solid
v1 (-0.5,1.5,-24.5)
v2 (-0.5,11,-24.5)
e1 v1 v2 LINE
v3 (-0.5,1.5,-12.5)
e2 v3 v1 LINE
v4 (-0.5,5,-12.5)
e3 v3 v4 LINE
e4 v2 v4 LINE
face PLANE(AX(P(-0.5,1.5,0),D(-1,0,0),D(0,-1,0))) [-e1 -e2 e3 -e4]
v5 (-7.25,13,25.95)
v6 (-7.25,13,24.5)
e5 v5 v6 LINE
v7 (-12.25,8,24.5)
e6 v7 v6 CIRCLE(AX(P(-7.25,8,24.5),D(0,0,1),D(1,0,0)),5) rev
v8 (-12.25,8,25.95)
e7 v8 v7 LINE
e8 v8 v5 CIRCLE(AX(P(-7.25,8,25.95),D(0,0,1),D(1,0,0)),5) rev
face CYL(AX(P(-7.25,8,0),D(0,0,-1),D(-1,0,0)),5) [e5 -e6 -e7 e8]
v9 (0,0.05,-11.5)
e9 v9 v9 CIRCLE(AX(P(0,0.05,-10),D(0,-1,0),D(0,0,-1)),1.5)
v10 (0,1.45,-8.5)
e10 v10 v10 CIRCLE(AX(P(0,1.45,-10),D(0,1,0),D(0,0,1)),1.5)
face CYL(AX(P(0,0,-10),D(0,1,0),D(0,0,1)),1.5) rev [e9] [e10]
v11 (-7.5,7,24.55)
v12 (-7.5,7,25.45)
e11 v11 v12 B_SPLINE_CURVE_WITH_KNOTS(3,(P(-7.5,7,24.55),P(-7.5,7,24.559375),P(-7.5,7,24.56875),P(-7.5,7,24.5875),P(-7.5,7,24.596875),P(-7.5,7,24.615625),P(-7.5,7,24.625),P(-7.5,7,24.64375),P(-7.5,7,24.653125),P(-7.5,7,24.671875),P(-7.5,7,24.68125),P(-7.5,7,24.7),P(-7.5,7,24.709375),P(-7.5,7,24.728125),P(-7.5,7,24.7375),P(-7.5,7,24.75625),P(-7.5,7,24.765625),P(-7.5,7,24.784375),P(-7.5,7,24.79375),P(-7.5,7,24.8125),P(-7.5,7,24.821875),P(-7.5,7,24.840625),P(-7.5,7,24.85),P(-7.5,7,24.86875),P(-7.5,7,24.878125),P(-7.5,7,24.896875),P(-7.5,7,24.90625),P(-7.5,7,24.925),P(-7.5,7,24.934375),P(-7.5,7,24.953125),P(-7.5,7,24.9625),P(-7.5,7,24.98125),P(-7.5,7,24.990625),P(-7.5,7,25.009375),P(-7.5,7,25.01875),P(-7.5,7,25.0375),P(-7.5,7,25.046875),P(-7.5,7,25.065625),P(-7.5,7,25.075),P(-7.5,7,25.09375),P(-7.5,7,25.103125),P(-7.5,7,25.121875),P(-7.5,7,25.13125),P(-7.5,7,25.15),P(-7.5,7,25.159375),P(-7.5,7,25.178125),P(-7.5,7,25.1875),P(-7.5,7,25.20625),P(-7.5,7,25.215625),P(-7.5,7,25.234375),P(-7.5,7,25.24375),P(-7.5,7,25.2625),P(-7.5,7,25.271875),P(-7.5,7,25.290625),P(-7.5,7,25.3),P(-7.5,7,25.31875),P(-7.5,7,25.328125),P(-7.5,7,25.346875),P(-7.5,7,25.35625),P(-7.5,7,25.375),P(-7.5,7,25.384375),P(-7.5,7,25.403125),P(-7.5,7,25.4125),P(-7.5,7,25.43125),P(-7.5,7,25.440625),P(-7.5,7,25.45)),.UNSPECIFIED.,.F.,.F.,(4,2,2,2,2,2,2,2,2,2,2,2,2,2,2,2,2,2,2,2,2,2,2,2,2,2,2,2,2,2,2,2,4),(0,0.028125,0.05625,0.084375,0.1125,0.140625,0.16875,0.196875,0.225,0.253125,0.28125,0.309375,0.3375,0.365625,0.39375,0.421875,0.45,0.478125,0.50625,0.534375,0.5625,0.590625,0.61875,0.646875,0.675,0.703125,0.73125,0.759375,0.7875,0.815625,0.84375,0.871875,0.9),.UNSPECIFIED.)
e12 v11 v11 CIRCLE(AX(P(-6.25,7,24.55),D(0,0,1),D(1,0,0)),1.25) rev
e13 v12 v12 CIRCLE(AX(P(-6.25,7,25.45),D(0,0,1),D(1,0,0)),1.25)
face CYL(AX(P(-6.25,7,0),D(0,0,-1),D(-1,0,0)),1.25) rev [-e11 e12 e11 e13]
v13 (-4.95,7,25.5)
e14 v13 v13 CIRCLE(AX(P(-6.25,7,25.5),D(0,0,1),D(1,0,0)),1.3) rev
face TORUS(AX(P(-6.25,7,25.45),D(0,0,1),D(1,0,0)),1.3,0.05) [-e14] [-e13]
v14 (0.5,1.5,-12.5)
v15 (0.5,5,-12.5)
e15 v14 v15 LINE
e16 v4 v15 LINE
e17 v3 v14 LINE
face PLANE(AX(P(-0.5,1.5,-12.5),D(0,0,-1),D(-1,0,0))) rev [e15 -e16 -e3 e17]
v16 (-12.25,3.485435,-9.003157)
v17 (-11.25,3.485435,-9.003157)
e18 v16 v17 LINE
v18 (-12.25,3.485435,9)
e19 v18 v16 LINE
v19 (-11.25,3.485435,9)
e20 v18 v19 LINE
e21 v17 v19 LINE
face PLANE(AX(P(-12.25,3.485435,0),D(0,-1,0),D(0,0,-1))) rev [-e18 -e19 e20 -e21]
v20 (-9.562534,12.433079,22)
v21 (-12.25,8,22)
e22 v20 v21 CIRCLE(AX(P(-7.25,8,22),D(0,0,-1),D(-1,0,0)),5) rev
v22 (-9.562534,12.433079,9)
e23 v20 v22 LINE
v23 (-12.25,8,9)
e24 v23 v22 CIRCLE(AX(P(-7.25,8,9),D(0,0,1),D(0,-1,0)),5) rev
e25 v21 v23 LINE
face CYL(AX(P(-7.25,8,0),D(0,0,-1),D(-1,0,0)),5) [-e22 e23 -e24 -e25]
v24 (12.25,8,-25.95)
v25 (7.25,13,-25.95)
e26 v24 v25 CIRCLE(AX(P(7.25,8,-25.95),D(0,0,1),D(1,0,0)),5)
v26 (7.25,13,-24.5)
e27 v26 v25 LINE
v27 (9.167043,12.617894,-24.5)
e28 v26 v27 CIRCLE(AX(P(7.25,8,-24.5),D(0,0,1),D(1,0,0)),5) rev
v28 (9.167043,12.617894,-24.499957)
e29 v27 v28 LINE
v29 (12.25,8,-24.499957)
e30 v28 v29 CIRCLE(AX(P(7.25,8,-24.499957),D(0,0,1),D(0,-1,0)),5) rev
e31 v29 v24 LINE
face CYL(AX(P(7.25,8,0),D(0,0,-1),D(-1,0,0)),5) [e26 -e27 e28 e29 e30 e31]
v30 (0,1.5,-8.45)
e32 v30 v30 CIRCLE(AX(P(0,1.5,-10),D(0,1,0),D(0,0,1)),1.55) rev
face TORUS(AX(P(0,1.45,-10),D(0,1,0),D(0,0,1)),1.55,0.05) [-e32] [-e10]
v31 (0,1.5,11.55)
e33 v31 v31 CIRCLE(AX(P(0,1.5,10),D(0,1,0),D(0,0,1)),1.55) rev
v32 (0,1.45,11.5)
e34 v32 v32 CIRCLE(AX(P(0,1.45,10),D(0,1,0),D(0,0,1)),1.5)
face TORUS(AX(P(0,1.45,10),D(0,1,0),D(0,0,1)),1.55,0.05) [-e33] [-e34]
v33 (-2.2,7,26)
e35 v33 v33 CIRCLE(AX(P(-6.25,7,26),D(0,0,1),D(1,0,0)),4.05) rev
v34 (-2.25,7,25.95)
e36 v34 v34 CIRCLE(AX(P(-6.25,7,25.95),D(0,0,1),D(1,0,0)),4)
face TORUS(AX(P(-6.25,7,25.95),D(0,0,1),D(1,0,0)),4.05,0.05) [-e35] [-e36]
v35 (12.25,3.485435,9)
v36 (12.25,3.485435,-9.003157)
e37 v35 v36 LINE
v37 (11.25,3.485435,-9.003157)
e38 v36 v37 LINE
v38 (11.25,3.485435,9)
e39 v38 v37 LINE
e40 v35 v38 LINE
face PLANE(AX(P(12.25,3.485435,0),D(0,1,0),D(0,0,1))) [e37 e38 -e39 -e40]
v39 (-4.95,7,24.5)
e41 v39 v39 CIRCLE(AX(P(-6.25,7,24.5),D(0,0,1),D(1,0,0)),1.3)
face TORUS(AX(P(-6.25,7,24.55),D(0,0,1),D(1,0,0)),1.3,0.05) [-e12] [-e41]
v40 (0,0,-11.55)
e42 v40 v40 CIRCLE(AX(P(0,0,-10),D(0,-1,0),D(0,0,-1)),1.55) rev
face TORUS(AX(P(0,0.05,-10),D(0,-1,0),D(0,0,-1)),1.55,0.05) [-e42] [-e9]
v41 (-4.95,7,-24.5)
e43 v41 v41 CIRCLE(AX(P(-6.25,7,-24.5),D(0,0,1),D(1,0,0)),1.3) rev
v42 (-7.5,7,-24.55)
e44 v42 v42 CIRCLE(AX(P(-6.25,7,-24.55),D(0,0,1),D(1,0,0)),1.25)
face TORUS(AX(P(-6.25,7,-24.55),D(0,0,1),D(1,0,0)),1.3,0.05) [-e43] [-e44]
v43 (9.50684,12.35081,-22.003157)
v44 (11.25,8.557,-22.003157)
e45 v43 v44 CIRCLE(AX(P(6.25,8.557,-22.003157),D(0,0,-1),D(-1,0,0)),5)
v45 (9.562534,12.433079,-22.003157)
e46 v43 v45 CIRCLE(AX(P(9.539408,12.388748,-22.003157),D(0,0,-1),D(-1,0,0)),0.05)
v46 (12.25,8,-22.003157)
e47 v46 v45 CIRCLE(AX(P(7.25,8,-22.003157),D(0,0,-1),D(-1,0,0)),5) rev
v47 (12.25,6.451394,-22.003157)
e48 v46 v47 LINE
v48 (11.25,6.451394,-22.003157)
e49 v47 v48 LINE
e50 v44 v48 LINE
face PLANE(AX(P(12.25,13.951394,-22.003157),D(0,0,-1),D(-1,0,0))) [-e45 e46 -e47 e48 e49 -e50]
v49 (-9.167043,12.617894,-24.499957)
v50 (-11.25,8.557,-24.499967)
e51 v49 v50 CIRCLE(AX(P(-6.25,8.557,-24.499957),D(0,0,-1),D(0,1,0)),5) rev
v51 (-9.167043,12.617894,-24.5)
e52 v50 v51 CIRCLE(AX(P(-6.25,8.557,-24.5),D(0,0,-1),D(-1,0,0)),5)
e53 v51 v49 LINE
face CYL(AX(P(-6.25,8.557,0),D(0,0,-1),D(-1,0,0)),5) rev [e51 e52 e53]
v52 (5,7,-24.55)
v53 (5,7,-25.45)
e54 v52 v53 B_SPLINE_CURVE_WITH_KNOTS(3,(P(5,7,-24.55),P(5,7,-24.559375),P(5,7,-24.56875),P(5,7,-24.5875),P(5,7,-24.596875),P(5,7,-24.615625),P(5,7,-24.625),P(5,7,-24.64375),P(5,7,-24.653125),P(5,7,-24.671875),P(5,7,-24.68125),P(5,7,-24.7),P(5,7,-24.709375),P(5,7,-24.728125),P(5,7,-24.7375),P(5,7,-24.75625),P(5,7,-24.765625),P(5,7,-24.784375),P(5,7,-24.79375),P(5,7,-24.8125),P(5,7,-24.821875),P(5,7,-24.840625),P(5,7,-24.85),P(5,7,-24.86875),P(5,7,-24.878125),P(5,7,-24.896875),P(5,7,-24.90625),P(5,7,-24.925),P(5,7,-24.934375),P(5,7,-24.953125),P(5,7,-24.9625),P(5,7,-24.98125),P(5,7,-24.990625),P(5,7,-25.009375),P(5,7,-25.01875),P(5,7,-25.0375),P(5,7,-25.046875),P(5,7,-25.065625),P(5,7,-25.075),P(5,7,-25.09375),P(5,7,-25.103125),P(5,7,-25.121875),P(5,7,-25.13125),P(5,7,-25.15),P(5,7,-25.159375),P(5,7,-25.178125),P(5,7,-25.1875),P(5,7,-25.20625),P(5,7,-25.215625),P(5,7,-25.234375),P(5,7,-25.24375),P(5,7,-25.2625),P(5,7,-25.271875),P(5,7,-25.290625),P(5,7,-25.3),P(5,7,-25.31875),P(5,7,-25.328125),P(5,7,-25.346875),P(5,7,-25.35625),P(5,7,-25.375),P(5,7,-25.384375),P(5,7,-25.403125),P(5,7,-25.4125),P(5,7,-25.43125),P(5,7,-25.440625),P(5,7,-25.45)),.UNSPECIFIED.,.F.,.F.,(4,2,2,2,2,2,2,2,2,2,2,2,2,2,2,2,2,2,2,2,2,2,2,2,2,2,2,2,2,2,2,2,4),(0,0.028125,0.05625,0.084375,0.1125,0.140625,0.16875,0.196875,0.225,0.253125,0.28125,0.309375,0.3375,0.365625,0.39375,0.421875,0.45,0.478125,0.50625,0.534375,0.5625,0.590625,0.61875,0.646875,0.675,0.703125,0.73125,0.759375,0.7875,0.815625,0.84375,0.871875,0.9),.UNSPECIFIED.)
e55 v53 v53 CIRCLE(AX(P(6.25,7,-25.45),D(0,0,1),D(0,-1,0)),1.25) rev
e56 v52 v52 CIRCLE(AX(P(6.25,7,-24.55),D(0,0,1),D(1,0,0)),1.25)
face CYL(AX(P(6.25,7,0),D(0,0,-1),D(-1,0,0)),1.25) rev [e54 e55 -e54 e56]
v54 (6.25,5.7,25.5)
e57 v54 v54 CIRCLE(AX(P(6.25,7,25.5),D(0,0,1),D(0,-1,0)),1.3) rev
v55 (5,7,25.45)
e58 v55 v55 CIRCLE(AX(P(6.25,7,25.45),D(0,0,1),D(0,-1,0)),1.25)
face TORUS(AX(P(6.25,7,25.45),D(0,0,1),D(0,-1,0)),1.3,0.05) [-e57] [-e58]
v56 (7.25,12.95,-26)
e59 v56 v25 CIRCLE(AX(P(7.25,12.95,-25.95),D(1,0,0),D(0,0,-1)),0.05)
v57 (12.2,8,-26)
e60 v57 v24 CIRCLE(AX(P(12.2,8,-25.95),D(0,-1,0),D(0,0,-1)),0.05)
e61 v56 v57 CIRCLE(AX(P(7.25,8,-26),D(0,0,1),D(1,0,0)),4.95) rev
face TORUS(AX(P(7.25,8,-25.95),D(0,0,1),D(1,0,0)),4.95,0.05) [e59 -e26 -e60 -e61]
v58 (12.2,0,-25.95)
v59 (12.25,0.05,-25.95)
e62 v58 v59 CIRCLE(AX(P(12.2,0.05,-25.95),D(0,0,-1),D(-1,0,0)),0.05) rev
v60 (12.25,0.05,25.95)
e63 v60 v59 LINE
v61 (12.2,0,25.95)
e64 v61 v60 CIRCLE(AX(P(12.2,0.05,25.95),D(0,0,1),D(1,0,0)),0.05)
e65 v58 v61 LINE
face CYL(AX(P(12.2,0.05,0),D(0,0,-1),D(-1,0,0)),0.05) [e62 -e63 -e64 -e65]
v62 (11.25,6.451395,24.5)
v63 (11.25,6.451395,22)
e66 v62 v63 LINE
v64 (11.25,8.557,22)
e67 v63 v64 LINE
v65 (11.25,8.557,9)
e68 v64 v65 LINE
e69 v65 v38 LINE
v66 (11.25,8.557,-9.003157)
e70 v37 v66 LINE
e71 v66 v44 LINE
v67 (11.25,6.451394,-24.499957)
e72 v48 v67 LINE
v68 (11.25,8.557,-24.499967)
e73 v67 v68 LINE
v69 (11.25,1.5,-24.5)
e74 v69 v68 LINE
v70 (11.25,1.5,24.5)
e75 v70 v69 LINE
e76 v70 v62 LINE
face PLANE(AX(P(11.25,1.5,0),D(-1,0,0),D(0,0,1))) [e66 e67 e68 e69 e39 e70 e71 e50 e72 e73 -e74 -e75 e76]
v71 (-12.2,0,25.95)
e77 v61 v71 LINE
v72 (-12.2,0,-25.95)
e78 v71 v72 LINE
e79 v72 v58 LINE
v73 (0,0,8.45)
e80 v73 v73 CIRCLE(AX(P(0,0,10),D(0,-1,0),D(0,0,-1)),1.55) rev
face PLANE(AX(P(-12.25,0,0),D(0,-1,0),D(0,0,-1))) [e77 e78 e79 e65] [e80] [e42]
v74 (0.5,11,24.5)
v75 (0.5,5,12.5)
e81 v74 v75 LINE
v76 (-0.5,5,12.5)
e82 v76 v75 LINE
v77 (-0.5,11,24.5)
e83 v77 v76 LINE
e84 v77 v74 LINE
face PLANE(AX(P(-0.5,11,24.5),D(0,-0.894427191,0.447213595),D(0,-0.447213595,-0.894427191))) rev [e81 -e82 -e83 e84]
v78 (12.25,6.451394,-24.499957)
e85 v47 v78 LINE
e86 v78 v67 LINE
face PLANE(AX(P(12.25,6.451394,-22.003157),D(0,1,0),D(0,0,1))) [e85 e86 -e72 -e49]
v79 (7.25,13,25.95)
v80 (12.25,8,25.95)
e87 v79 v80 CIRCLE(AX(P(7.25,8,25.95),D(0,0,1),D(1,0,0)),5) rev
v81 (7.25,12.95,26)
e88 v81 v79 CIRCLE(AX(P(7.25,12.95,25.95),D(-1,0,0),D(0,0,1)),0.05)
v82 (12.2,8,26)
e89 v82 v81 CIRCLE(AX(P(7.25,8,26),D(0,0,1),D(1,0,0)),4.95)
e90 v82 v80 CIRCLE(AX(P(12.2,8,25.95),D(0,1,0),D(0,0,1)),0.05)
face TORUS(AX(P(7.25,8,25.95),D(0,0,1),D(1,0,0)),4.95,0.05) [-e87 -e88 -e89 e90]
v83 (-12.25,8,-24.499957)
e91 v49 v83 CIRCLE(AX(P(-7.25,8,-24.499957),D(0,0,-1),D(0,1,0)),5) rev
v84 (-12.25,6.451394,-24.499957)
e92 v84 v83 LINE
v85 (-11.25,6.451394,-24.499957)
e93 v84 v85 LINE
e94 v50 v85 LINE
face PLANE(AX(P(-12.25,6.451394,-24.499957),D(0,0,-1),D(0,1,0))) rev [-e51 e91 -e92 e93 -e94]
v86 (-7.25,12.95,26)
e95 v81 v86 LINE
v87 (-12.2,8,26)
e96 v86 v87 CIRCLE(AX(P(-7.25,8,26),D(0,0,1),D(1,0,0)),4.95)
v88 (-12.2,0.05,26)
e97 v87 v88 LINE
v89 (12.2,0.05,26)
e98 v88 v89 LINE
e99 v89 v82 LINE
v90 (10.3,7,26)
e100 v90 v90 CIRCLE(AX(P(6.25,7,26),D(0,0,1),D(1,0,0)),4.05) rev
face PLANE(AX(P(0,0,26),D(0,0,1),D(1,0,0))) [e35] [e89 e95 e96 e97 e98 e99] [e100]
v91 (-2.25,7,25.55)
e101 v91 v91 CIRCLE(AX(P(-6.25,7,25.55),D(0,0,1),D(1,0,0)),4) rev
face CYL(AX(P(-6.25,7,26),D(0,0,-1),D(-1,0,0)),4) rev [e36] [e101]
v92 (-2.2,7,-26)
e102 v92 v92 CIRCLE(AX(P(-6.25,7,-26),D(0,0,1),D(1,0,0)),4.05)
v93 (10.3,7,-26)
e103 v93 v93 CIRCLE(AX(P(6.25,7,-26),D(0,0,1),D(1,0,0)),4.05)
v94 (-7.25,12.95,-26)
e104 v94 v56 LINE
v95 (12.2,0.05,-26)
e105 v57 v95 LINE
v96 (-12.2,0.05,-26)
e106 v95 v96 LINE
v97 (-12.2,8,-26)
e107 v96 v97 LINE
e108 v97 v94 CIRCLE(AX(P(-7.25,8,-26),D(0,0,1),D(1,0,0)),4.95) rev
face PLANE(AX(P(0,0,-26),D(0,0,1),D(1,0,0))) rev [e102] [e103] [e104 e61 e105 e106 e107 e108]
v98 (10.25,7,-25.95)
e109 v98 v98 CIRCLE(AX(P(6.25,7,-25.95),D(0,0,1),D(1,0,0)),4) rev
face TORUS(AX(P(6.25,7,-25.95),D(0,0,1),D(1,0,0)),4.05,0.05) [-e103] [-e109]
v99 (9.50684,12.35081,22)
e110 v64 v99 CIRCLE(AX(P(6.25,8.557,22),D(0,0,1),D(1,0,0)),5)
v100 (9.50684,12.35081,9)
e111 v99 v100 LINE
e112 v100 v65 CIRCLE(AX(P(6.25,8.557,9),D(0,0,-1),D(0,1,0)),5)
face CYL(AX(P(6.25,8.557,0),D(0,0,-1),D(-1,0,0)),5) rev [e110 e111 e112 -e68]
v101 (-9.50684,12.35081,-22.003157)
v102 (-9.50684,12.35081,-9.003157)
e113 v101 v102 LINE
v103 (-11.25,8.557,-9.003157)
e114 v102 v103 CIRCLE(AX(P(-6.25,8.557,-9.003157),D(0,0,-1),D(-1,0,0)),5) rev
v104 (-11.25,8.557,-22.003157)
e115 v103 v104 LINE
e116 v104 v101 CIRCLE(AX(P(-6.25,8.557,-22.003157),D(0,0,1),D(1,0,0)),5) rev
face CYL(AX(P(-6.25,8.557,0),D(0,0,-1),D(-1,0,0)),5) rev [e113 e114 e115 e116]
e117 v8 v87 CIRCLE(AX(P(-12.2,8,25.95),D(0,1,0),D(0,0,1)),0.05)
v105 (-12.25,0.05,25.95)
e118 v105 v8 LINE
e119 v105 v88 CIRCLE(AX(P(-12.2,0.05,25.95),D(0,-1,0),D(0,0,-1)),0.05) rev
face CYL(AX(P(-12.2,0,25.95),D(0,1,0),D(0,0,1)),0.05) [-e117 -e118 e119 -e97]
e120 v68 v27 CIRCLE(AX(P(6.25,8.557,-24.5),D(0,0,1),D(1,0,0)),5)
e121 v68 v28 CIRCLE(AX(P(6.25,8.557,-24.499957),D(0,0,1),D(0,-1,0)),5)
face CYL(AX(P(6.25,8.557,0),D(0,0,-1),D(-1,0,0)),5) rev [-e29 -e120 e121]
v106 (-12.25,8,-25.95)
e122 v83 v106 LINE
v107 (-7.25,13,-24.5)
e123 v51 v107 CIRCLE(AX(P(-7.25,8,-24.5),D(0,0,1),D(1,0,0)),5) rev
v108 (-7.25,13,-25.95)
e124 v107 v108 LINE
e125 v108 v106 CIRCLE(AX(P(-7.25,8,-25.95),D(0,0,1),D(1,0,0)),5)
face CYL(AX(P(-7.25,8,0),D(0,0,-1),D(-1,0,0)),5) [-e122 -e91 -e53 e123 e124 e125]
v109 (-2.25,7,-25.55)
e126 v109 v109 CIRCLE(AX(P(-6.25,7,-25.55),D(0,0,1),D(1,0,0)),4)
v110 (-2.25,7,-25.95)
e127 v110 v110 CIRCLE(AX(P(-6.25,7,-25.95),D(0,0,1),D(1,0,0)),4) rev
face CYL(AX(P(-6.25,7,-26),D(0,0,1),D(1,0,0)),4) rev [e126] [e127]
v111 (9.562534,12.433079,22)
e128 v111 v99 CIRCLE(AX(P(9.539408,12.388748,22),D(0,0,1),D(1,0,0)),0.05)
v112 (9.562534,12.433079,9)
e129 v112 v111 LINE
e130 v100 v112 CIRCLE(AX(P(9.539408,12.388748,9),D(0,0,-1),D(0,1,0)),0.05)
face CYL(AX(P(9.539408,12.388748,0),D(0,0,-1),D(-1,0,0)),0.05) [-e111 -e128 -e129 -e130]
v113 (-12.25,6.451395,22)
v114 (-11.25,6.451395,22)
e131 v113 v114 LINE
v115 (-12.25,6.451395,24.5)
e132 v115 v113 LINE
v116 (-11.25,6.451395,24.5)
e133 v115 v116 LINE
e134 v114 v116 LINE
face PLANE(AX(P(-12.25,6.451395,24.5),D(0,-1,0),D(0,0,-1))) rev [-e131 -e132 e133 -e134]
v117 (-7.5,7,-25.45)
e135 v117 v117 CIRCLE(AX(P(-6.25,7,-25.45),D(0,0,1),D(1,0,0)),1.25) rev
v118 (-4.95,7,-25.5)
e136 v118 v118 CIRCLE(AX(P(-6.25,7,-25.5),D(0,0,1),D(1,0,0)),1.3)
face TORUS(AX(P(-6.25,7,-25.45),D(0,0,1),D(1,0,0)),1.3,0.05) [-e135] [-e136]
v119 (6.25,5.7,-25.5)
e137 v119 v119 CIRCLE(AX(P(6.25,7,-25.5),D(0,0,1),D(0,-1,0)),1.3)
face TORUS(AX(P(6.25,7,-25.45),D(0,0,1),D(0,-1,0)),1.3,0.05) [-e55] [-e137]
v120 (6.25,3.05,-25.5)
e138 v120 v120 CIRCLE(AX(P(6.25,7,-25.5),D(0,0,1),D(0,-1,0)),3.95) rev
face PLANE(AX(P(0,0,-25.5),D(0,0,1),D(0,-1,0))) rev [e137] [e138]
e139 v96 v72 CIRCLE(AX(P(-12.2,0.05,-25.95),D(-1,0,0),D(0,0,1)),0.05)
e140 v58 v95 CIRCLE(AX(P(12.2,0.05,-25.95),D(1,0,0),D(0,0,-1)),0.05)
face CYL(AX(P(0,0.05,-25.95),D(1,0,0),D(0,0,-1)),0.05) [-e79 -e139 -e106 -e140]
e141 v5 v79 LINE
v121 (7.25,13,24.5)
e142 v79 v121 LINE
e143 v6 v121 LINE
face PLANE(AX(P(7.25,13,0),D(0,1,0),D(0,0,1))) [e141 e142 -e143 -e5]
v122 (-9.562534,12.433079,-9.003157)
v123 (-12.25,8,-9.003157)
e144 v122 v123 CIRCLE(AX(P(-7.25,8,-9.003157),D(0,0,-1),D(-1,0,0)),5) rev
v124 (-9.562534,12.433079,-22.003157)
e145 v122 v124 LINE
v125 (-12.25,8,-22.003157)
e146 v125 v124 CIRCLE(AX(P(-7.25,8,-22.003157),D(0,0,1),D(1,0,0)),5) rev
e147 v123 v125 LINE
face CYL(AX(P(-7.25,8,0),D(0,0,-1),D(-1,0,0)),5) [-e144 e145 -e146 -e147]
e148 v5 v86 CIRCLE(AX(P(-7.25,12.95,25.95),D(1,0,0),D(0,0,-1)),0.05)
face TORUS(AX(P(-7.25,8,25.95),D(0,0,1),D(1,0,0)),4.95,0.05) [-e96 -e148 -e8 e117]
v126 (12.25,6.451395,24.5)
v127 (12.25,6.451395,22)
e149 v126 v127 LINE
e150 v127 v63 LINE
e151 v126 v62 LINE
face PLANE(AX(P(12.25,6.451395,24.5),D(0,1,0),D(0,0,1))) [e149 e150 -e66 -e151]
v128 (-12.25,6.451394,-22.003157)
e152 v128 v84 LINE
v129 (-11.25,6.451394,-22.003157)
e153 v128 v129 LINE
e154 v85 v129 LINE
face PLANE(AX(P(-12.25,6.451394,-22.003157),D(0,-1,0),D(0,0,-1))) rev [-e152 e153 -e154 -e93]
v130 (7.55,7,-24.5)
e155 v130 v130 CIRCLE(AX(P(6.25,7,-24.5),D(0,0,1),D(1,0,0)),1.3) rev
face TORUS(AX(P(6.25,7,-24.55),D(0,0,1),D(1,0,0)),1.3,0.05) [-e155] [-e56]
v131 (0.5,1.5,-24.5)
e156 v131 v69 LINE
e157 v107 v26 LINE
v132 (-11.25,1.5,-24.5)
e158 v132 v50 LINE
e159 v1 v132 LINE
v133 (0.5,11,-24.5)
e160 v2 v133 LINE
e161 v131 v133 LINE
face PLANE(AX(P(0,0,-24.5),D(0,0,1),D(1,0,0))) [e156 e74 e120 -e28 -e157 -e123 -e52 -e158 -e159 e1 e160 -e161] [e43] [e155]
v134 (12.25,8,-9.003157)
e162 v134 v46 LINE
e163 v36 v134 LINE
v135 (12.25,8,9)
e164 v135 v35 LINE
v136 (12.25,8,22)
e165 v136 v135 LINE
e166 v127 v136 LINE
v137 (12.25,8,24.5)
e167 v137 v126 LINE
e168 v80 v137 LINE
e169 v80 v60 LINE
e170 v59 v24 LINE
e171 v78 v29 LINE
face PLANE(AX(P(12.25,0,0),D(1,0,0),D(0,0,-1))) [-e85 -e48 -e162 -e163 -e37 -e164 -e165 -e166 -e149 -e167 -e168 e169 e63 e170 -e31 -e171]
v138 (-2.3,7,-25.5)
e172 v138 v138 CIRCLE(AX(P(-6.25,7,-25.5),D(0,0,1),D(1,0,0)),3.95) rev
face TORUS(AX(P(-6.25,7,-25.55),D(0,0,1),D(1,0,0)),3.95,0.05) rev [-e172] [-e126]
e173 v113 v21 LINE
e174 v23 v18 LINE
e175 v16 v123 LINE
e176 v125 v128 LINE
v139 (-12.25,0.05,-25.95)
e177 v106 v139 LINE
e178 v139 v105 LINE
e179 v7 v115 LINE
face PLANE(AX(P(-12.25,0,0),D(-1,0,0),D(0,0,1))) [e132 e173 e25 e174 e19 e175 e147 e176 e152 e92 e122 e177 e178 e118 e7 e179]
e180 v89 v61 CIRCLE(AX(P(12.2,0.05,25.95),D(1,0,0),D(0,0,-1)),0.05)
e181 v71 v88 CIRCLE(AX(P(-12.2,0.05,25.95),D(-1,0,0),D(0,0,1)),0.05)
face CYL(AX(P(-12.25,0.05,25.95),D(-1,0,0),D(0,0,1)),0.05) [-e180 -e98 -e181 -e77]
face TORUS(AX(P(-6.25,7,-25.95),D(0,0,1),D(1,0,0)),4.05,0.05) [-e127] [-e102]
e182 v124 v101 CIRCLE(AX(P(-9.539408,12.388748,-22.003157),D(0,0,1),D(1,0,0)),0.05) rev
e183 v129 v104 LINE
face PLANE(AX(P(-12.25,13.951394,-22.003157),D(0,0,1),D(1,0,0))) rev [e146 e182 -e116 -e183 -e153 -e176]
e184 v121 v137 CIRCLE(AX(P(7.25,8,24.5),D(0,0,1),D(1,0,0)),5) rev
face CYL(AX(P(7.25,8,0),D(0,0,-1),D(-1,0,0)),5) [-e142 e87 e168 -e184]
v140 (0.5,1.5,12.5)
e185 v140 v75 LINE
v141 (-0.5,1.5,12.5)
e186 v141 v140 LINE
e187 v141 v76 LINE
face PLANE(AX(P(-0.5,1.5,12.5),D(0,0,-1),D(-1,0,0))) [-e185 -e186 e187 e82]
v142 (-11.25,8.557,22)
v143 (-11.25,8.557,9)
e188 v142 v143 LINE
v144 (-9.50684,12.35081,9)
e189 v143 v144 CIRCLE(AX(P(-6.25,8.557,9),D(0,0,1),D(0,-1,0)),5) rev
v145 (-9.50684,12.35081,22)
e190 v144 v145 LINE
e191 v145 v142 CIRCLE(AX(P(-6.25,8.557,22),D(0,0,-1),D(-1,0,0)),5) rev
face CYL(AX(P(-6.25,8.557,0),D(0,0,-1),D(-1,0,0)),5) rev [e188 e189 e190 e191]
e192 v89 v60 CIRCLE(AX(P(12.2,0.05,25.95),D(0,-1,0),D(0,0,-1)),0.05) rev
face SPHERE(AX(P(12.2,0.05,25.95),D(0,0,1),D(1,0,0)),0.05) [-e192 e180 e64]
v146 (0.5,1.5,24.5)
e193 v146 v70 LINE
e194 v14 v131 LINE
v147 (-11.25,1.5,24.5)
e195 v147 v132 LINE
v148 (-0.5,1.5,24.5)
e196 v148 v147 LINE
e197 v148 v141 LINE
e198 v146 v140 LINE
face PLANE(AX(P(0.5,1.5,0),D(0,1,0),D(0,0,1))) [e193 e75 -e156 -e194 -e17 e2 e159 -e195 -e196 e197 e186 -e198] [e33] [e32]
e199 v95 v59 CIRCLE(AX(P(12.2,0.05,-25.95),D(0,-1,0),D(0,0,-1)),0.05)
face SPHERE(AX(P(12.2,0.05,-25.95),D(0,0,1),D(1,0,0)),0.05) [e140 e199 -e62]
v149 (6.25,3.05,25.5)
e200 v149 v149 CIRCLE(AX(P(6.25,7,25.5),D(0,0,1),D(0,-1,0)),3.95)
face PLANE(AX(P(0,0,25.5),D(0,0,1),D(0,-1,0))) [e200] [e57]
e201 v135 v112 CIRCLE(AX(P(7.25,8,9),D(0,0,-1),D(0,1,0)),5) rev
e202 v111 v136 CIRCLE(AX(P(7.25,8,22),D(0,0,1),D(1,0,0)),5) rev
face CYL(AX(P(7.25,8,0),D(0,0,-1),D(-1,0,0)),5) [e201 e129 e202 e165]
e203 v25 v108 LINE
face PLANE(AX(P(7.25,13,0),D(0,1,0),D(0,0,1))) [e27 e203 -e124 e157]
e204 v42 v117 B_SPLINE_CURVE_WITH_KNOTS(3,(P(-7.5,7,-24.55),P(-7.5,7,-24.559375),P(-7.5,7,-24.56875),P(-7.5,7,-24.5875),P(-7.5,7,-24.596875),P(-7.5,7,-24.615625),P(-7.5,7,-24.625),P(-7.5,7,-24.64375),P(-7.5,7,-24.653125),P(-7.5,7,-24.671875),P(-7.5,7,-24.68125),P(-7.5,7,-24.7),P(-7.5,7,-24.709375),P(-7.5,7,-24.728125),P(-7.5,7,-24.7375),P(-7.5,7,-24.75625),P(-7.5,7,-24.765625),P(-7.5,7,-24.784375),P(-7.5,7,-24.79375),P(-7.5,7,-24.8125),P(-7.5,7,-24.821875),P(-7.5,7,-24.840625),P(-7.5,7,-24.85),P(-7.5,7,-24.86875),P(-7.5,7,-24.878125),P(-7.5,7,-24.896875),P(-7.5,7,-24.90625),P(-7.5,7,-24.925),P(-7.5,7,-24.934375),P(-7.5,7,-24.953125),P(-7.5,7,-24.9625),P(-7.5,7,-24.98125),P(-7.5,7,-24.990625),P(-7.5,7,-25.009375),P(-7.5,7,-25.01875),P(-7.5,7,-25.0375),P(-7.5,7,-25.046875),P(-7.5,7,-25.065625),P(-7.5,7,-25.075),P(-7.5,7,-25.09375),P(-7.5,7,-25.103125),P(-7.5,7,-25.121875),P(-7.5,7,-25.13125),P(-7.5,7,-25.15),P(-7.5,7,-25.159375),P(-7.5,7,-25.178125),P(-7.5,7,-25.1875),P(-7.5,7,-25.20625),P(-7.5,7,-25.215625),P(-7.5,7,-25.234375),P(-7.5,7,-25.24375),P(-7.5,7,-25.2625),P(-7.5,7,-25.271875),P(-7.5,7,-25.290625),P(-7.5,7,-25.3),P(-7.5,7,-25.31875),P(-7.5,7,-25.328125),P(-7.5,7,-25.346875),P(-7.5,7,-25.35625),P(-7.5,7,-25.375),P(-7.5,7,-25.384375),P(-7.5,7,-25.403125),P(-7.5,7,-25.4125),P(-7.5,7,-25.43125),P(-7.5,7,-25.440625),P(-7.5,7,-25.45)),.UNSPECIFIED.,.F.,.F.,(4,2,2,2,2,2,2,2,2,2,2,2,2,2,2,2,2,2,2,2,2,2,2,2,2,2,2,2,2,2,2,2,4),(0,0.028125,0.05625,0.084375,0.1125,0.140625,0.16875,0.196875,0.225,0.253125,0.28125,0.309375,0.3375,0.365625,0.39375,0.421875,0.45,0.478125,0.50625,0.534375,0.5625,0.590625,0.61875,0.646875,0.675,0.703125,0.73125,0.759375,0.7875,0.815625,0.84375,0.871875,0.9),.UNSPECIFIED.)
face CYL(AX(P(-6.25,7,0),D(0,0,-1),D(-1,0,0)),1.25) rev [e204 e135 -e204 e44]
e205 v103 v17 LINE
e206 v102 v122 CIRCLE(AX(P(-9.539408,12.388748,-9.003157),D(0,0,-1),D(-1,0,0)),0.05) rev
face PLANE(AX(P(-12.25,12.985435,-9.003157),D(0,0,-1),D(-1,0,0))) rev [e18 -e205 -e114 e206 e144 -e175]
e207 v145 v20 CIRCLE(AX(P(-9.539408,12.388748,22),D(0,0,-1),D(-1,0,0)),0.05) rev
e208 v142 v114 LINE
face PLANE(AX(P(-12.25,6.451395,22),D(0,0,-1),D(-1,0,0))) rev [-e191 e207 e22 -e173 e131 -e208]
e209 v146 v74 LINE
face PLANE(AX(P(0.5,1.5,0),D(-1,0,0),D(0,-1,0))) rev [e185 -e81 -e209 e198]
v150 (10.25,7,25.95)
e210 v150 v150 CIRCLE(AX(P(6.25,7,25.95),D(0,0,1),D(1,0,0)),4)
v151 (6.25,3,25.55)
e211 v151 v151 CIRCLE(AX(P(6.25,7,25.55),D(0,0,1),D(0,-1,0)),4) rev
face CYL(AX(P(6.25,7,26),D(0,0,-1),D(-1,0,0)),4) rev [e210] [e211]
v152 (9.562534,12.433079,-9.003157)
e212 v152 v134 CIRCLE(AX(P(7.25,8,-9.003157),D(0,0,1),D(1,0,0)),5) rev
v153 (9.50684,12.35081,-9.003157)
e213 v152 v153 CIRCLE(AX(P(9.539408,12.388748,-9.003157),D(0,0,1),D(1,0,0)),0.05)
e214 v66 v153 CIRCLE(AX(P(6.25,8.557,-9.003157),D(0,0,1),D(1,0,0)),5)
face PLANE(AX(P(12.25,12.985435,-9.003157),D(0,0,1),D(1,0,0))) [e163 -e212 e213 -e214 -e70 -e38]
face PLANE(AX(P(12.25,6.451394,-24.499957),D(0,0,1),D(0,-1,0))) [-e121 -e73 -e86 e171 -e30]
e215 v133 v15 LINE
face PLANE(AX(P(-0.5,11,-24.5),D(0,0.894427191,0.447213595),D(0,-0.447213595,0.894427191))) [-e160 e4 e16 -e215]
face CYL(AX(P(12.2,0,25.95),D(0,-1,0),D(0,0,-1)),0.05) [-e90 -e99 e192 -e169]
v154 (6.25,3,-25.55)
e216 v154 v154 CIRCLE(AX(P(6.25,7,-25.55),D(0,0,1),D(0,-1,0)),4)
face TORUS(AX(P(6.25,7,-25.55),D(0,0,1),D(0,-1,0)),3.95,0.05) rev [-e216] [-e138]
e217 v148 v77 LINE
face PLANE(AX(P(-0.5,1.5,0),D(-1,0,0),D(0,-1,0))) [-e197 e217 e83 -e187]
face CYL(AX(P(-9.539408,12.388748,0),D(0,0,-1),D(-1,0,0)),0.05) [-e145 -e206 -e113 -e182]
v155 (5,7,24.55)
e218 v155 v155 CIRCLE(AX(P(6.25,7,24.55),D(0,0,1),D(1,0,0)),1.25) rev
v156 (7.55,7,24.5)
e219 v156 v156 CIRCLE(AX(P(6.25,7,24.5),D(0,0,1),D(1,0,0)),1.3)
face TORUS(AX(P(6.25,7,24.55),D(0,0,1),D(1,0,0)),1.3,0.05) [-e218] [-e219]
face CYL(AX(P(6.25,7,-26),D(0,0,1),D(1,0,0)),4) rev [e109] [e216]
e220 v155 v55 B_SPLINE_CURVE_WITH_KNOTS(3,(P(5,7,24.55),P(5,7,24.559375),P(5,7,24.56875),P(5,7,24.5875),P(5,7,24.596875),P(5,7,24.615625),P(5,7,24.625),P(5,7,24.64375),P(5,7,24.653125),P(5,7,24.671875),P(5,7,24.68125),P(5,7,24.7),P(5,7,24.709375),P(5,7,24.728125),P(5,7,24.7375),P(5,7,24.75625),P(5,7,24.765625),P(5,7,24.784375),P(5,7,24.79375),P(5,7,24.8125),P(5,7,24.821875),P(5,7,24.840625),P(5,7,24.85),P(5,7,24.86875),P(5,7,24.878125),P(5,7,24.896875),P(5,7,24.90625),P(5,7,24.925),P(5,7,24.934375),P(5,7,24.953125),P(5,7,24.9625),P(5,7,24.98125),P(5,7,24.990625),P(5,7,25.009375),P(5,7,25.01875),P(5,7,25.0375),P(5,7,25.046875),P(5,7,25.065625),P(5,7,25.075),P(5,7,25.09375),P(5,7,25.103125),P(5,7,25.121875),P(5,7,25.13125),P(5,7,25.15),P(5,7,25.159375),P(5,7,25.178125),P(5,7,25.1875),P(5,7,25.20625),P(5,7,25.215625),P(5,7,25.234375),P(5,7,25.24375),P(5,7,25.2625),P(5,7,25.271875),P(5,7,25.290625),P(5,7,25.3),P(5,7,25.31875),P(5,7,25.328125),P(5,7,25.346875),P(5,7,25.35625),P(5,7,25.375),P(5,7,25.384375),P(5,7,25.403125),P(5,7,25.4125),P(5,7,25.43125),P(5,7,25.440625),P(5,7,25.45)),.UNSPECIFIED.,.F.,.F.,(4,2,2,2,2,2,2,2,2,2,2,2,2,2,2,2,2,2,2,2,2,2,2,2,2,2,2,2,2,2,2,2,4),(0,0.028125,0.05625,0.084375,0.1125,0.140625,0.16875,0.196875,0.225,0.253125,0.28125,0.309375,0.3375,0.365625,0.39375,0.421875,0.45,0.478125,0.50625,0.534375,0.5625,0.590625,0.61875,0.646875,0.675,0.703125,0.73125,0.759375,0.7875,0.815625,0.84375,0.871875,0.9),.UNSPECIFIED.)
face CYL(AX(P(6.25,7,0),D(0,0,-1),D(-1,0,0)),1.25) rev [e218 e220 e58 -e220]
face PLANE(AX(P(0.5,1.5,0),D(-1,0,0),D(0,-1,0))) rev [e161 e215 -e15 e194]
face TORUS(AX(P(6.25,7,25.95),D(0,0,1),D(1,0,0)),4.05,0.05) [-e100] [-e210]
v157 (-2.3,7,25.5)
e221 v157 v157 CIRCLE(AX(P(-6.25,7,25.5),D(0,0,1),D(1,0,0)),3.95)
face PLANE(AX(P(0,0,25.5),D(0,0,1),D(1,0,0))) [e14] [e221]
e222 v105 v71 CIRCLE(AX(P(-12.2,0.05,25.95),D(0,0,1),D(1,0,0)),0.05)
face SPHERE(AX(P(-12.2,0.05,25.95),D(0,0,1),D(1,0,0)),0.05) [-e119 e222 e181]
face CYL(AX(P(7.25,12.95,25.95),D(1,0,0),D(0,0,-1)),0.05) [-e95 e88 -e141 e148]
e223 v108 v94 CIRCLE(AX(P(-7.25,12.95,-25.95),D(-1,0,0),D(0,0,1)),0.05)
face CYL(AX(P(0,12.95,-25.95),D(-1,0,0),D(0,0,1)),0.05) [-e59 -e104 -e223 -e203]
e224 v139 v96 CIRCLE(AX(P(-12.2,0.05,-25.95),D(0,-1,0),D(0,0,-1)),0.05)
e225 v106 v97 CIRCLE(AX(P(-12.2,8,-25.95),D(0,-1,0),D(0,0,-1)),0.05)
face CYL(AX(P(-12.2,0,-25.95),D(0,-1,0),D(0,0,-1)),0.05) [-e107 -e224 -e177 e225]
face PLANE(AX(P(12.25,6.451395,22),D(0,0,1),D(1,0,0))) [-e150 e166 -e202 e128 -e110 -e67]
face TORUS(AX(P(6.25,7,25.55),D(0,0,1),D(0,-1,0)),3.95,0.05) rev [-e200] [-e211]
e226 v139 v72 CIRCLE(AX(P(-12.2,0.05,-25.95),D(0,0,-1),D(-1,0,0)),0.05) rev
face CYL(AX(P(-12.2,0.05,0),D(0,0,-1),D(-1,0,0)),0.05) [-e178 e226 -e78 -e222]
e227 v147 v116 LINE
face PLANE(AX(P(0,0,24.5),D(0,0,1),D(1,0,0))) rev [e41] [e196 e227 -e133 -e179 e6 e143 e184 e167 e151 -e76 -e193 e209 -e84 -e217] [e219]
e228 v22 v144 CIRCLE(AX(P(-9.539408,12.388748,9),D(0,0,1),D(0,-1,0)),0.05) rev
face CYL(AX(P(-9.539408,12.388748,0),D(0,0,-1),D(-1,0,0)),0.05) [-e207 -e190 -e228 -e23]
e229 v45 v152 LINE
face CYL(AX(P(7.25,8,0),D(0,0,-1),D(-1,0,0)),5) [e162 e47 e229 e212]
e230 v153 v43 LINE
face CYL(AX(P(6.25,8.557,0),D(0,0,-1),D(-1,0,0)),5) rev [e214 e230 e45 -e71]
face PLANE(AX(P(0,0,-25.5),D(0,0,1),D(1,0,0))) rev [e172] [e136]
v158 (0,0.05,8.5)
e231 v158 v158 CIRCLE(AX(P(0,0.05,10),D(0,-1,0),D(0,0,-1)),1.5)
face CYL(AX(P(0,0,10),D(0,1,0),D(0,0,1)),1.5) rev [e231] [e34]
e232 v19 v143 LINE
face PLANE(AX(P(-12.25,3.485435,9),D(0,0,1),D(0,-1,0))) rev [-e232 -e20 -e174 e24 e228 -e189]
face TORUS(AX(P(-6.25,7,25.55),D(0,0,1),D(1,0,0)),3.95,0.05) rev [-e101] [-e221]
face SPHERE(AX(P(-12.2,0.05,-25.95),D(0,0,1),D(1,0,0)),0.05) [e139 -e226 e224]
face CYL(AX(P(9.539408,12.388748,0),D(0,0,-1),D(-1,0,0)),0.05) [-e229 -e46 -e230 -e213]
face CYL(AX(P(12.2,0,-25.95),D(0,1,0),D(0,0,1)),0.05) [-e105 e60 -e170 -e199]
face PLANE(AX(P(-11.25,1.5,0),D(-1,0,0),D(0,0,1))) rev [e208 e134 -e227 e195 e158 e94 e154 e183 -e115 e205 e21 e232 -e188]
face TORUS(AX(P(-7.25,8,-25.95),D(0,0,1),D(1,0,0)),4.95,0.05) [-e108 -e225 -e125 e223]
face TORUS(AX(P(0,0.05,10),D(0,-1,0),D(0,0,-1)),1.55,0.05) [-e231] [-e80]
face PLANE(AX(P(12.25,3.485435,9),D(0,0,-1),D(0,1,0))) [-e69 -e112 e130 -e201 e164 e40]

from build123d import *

# Parameters (mm, degrees)
DODANIE_WYCI_GNI_CIE3_DEPTH      = 26
DODANIE_WYCI_GNI_CIE3_DEPTH_BACK = 26
SZKIC_3D1_R                      = 1.25
WYTNIJ_WYCI_GNI_CIE1_DEPTH       = 24.5
WYTNIJ_WYCI_GNI_CIE1_DEPTH_BACK  = 24.5
WYTNIJ_WYCI_GNI_CIE2_DEPTH       = 0.5
WYTNIJ_WYCI_GNI_CIE3_DEPTH       = 5
SZKIC_3D5_R                      = 1.5
WYTNIJ_WYCI_GNI_CIE4_DEPTH       = 5
WYTNIJ_WYCI_GNI_CIE5_START       = 25.5
WYTNIJ_WYCI_GNI_CIE5_OUTLINE_R   = 4
WYTNIJ_WYCI_GNI_CIE5_OUTLINE_R_2 = 1.25
WYTNIJ_WYCI_GNI_CIE5_DEPTH       = 0.5
ZAOKR_GLENIE1_R                  = 0.05
ZAOKR_GLENIE2_R                  = 0.05
ZAOKR_GLENIE3_R                  = 0.05
ZAOKR_GLENIE4_R                  = 0.05
ZAOKR_GLENIE5_R                  = 0.05
ZAOKR_GLENIE6_R                  = 0.05
ZAOKR_GLENIE7_R                  = 0.05
ZAOKR_GLENIE8_R                  = 0.05
ZAOKR_GLENIE9_R                  = 0.05
ZAOKR_GLENIE10_R                 = 0.05
ZAOKR_GLENIE11_R                 = 0.05
ZAOKR_GLENIE12_R                 = 0.05
ZAOKR_GLENIE13_R                 = 0.05
ZAOKR_GLENIE14_R                 = 0.05
ZAOKR_GLENIE15_R                 = 0.05
ZAOKR_GLENIE16_R                 = 0.05
ZAOKR_GLENIE17_R                 = 0.05
ZAOKR_GLENIE18_R                 = 0.05
ZAOKR_GLENIE19_R                 = 0.05
ZAOKR_GLENIE20_R                 = 0.05
ZAOKR_GLENIE21_R                 = 0.05
ZAOKR_GLENIE26_R                 = 0.05


# Read off the part's stored shape, not the designer's step: Wytnij-wyciągnięcie5
with BuildPart() as part:
    # Szkic 3D1 → Dodanie-wyciągnięcie3 (new, two sides: drawn at the far end of the back side and taken through both)
    with BuildSketch(Plane(origin=(-12.25, 0, 0), x_dir=(0.9506054564909805, 0.3104017817113406, 0), z_dir=(0, 0, 1)).offset(-DODANIE_WYCI_GNI_CIE3_DEPTH_BACK)):
        with BuildLine():
            Line((0, 0), (23.289833684, -7.604843652))
            Line((23.289833684, -7.604843652), (25.773047938, 0))
            ThreePointArc((25.773047938, 0), (25.478354502, 3.815470707), (22.572029564, 6.305036191))
            Line((22.572029564, 6.305036191), (8.788250445, 10.805862026))
            ThreePointArc((8.788250445, 10.805862026), (4.972779737, 10.51116859), (2.483214254, 7.604843652))
            Line((2.483214254, 7.604843652), (0, 0))
        make_face()
        with Locations(Location((19.759013417, 0.911805234, 0), (0, 0, 161.916554617))):
            Circle(SZKIC_3D1_R, mode=Mode.SUBTRACT)
        with Locations(Location((7.876445211, 4.791827505, 0), (0, 0, 161.916554617))):
            Circle(SZKIC_3D1_R, mode=Mode.SUBTRACT)
    extrude(amount=DODANIE_WYCI_GNI_CIE3_DEPTH + DODANIE_WYCI_GNI_CIE3_DEPTH_BACK)

    # Szkic 3D2 → Wytnij-wyciągnięcie1 (cut, two sides: drawn at the far end of the back side and taken through both)
    with BuildSketch(Plane(origin=(0.5, 1.5, 0), x_dir=(-0.48849758700314805, 0.8725652454069562, 0), z_dir=(0, 0, -1)).offset(-WYTNIJ_WYCI_GNI_CIE1_DEPTH_BACK)):
        with BuildLine():
            Line((0, 0), (-5.25134906, 9.380076388))
            Line((-5.25134906, 9.380076388), (0.906343877, 12.82740386))
            ThreePointArc((0.906343877, 12.82740386), (4.70671604, 13.276661425), (7.711658039, 10.907065568))
            Line((7.711658039, 10.907065568), (10.520519164, 5.889815406))
            Line((10.520519164, 5.889815406), (0, 0))
        make_face()
        with BuildLine():
            Line((5.739846647, -10.252641634), (11.897539584, -6.805314162))
            ThreePointArc((11.897539584, -6.805314162), (14.267135441, -3.800372163), (13.817877876, 0))
            Line((13.817877876, 0), (11.009016751, 5.017250161))
            Line((11.009016751, 5.017250161), (0.488497587, -0.872565245))
            Line((0.488497587, -0.872565245), (5.739846647, -10.252641634))
        make_face()
    extrude(amount=WYTNIJ_WYCI_GNI_CIE1_DEPTH + WYTNIJ_WYCI_GNI_CIE1_DEPTH_BACK, mode=Mode.SUBTRACT)

    # Szkic 3D3 → Wytnij-wyciągnięcie2 (cut, symmetric)
    with BuildSketch(Plane(origin=(0, 1.5, -12.5), x_dir=(0, 0.29680508017942747, 0.9549380840555495), z_dir=(-1, 0, 0))):
        Polygon((0, 0), (1.038817781, 3.342283294), (-8.639608747, 12.633572761), (-8.045998587, 14.543448929), (38.745967532, 0), (38.152357372, -1.909876168), (24.912269882, -4.07784371), (23.873452101, -7.420127004), align=None)
    extrude(amount=WYTNIJ_WYCI_GNI_CIE2_DEPTH, both=True, mode=Mode.SUBTRACT)

    # Szkic 3D4 → Wytnij-wyciągnięcie3 (cut)
    with BuildSketch(Plane(origin=(12.25, 3.485434748, 0), x_dir=(0, 0.3928396043672502, 0.9196070058674969), z_dir=(-1, 0, 0))):
        Polygon((0, 0), (8.276463053, -3.535556439), (12.008439294, 5.200710116), (3.729073145, 8.737506707), (-4.547389908, 12.273063146), (-8.27936615, 3.53679659), align=None)
        Polygon((21.396500798, -5.914953429), (24.342797831, 0.982099115), (26.641815589, 0), (23.695518556, -6.897052544), align=None)
        Polygon((-21.365185846, 12.352070027), (-18.418888814, 19.249122571), (-16.122814041, 18.268280647), (-19.069111074, 11.371228103), align=None)
    wytnij_wyci_gni_cie3 = extrude(amount=WYTNIJ_WYCI_GNI_CIE3_DEPTH, mode=Mode.SUBTRACT)

    # Lustro1: Wytnij-wyciągnięcie3 across plane
    add(wytnij_wyci_gni_cie3.mirror(Plane(origin=(0, 0, 0), x_dir=(0, 0, 1), z_dir=(1, 0, 0))), mode=Mode.SUBTRACT)

    # Szkic 3D5 → Wytnij-wyciągnięcie4 (cut)
    with BuildSketch(Plane(origin=(0, 0, 0), x_dir=(0, 0, -1), z_dir=(0, -1, 0))):
        with Locations(Location((10, 0, 0), (0, 0, 180))):
            Circle(SZKIC_3D5_R)
        with Locations(Location((-10, 0, 0), (0, 0, 180))):
            Circle(SZKIC_3D5_R)
    extrude(amount=-WYTNIJ_WYCI_GNI_CIE4_DEPTH, mode=Mode.SUBTRACT)

    # Wytnij-wyciągnięcie5 outline → Wytnij-wyciągnięcie5 (cut)
    # profile 1 of 2: a face of its own
    with BuildSketch(Plane.XY.offset(WYTNIJ_WYCI_GNI_CIE5_START)):
        with Locations((-6.25, 7)):
            Circle(WYTNIJ_WYCI_GNI_CIE5_OUTLINE_R)
        with Locations((-6.25, 7)):
            Circle(WYTNIJ_WYCI_GNI_CIE5_OUTLINE_R_2, mode=Mode.SUBTRACT)
    # profile 2 of 2: a face of its own
    with BuildSketch(Plane.XY.offset(WYTNIJ_WYCI_GNI_CIE5_START)):
        with Locations((6.25, 7)):
            Circle(WYTNIJ_WYCI_GNI_CIE5_OUTLINE_R)
        with Locations((6.25, 7)):
            Circle(WYTNIJ_WYCI_GNI_CIE5_OUTLINE_R_2, mode=Mode.SUBTRACT)
    wytnij_wyci_gni_cie5 = extrude(amount=WYTNIJ_WYCI_GNI_CIE5_DEPTH, mode=Mode.SUBTRACT)

    # Lustro2: Wytnij-wyciągnięcie5 across plane
    add(wytnij_wyci_gni_cie5.mirror(Plane.XY), mode=Mode.SUBTRACT)

    # Zaokrąglenie1
    zaokr_glenie1_edges = [part.edges().sort_by_distance(p)[0] for p in [
        (2.25, 7, -26),
    ]]
    fillet(zaokr_glenie1_edges, radius=ZAOKR_GLENIE1_R)

    # Zaokrąglenie2
    zaokr_glenie2_edges = [part.edges().sort_by_distance(p)[0] for p in [
        (-10.25, 7, -25.5),
    ]]
    fillet(zaokr_glenie2_edges, radius=ZAOKR_GLENIE2_R)

    # Zaokrąglenie3
    zaokr_glenie3_edges = [part.edges().sort_by_distance(p)[0] for p in [
        (2.25, 7, -25.5),
    ]]
    fillet(zaokr_glenie3_edges, radius=ZAOKR_GLENIE3_R)

    # Zaokrąglenie4
    zaokr_glenie4_edges = [part.edges().sort_by_distance(p)[0] for p in [
        (2.25, 7, 25.5),
    ]]
    fillet(zaokr_glenie4_edges, radius=ZAOKR_GLENIE4_R)

    # Zaokrąglenie5
    zaokr_glenie5_edges = [part.edges().sort_by_distance(p)[0] for p in [
        (-10.25, 7, 25.5),
    ]]
    fillet(zaokr_glenie5_edges, radius=ZAOKR_GLENIE5_R)

    # Zaokrąglenie6
    zaokr_glenie6_edges = [part.edges().sort_by_distance(p)[0] for p in [
        (0, 1.5, -11.5),
    ]]
    fillet(zaokr_glenie6_edges, radius=ZAOKR_GLENIE6_R)

    # Zaokrąglenie7
    zaokr_glenie7_edges = [part.edges().sort_by_distance(p)[0] for p in [
        (0, 1.5, 8.5),
    ]]
    fillet(zaokr_glenie7_edges, radius=ZAOKR_GLENIE7_R)

    # Zaokrąglenie8
    zaokr_glenie8_edges = [part.edges().sort_by_distance(p)[0] for p in [
        (7.5, 7, 25.5),
    ]]
    fillet(zaokr_glenie8_edges, radius=ZAOKR_GLENIE8_R)

    # Zaokrąglenie9
    zaokr_glenie9_edges = [part.edges().sort_by_distance(p)[0] for p in [
        (-5, 7, -25.5),
    ]]
    fillet(zaokr_glenie9_edges, radius=ZAOKR_GLENIE9_R)

    # Zaokrąglenie10
    zaokr_glenie10_edges = [part.edges().sort_by_distance(p)[0] for p in [
        (-5, 7, 25.5),
    ]]
    fillet(zaokr_glenie10_edges, radius=ZAOKR_GLENIE10_R)

    # Zaokrąglenie11
    zaokr_glenie11_edges = [part.edges().sort_by_distance(p)[0] for p in [
        (7.5, 7, -25.5),
    ]]
    fillet(zaokr_glenie11_edges, radius=ZAOKR_GLENIE11_R)

    # Zaokrąglenie12
    zaokr_glenie12_edges = [part.edges().sort_by_distance(p)[0] for p in [
        (-12.25, 4, 26),
        (0, 0, 26),
        (12.25, 4, 26),
        (0, 13, 26),
        (-12.25, 4, -26),
        (0, 0, -26),
        (12.25, 4, -26),
        (0, 13, -26),
        (12.25, 0, 0),
        (-12.25, 0, 0),
    ]]
    fillet(zaokr_glenie12_edges, radius=ZAOKR_GLENIE12_R)

    # Zaokrąglenie13
    zaokr_glenie13_edges = [part.edges().sort_by_distance(p)[0] for p in [
        (7.5, 7, 24.5),
    ]]
    fillet(zaokr_glenie13_edges, radius=ZAOKR_GLENIE13_R)

    # Zaokrąglenie14
    zaokr_glenie14_edges = [part.edges().sort_by_distance(p)[0] for p in [
        (-5, 7, 24.5),
    ]]
    fillet(zaokr_glenie14_edges, radius=ZAOKR_GLENIE14_R)

    # Zaokrąglenie15
    zaokr_glenie15_edges = [part.edges().sort_by_distance(p)[0] for p in [
        (-5, 7, -24.5),
    ]]
    fillet(zaokr_glenie15_edges, radius=ZAOKR_GLENIE15_R)

    # Zaokrąglenie16
    zaokr_glenie16_edges = [part.edges().sort_by_distance(p)[0] for p in [
        (7.5, 7, -24.5),
    ]]
    fillet(zaokr_glenie16_edges, radius=ZAOKR_GLENIE16_R)

    # Zaokrąglenie17
    zaokr_glenie17_edges = [part.edges().sort_by_distance(p)[0] for p in [
        (0, 0, -11.5),
    ]]
    fillet(zaokr_glenie17_edges, radius=ZAOKR_GLENIE17_R)

    # Zaokrąglenie18
    zaokr_glenie18_edges = [part.edges().sort_by_distance(p)[0] for p in [
        (0, 0, 8.5),
    ]]
    fillet(zaokr_glenie18_edges, radius=ZAOKR_GLENIE18_R)

    # Zaokrąglenie19
    zaokr_glenie19_edges = [part.edges().sort_by_distance(p)[0] for p in [
        (2.25, 7, 26),
    ]]
    fillet(zaokr_glenie19_edges, radius=ZAOKR_GLENIE19_R)

    # Zaokrąglenie20
    zaokr_glenie20_edges = [part.edges().sort_by_distance(p)[0] for p in [
        (-10.25, 7, 26),
    ]]
    fillet(zaokr_glenie20_edges, radius=ZAOKR_GLENIE20_R)

    # Zaokrąglenie21
    zaokr_glenie21_edges = [part.edges().sort_by_distance(p)[0] for p in [
        (-10.25, 7, -26),
    ]]
    fillet(zaokr_glenie21_edges, radius=ZAOKR_GLENIE21_R)

    # Zaokrąglenie26
    zaokr_glenie26_edges = [part.edges().sort_by_distance(p)[0] for p in [
        (9.167042616, 12.617894283, 15.5),
        (9.167042616, 12.617894283, -15.503156889),
        (-9.167042616, 12.617894283, 15.5),
        (-9.167042616, 12.617894283, -15.503156889),
    ]]
    fillet(zaokr_glenie26_edges, radius=ZAOKR_GLENIE26_R)


solid = part.part
